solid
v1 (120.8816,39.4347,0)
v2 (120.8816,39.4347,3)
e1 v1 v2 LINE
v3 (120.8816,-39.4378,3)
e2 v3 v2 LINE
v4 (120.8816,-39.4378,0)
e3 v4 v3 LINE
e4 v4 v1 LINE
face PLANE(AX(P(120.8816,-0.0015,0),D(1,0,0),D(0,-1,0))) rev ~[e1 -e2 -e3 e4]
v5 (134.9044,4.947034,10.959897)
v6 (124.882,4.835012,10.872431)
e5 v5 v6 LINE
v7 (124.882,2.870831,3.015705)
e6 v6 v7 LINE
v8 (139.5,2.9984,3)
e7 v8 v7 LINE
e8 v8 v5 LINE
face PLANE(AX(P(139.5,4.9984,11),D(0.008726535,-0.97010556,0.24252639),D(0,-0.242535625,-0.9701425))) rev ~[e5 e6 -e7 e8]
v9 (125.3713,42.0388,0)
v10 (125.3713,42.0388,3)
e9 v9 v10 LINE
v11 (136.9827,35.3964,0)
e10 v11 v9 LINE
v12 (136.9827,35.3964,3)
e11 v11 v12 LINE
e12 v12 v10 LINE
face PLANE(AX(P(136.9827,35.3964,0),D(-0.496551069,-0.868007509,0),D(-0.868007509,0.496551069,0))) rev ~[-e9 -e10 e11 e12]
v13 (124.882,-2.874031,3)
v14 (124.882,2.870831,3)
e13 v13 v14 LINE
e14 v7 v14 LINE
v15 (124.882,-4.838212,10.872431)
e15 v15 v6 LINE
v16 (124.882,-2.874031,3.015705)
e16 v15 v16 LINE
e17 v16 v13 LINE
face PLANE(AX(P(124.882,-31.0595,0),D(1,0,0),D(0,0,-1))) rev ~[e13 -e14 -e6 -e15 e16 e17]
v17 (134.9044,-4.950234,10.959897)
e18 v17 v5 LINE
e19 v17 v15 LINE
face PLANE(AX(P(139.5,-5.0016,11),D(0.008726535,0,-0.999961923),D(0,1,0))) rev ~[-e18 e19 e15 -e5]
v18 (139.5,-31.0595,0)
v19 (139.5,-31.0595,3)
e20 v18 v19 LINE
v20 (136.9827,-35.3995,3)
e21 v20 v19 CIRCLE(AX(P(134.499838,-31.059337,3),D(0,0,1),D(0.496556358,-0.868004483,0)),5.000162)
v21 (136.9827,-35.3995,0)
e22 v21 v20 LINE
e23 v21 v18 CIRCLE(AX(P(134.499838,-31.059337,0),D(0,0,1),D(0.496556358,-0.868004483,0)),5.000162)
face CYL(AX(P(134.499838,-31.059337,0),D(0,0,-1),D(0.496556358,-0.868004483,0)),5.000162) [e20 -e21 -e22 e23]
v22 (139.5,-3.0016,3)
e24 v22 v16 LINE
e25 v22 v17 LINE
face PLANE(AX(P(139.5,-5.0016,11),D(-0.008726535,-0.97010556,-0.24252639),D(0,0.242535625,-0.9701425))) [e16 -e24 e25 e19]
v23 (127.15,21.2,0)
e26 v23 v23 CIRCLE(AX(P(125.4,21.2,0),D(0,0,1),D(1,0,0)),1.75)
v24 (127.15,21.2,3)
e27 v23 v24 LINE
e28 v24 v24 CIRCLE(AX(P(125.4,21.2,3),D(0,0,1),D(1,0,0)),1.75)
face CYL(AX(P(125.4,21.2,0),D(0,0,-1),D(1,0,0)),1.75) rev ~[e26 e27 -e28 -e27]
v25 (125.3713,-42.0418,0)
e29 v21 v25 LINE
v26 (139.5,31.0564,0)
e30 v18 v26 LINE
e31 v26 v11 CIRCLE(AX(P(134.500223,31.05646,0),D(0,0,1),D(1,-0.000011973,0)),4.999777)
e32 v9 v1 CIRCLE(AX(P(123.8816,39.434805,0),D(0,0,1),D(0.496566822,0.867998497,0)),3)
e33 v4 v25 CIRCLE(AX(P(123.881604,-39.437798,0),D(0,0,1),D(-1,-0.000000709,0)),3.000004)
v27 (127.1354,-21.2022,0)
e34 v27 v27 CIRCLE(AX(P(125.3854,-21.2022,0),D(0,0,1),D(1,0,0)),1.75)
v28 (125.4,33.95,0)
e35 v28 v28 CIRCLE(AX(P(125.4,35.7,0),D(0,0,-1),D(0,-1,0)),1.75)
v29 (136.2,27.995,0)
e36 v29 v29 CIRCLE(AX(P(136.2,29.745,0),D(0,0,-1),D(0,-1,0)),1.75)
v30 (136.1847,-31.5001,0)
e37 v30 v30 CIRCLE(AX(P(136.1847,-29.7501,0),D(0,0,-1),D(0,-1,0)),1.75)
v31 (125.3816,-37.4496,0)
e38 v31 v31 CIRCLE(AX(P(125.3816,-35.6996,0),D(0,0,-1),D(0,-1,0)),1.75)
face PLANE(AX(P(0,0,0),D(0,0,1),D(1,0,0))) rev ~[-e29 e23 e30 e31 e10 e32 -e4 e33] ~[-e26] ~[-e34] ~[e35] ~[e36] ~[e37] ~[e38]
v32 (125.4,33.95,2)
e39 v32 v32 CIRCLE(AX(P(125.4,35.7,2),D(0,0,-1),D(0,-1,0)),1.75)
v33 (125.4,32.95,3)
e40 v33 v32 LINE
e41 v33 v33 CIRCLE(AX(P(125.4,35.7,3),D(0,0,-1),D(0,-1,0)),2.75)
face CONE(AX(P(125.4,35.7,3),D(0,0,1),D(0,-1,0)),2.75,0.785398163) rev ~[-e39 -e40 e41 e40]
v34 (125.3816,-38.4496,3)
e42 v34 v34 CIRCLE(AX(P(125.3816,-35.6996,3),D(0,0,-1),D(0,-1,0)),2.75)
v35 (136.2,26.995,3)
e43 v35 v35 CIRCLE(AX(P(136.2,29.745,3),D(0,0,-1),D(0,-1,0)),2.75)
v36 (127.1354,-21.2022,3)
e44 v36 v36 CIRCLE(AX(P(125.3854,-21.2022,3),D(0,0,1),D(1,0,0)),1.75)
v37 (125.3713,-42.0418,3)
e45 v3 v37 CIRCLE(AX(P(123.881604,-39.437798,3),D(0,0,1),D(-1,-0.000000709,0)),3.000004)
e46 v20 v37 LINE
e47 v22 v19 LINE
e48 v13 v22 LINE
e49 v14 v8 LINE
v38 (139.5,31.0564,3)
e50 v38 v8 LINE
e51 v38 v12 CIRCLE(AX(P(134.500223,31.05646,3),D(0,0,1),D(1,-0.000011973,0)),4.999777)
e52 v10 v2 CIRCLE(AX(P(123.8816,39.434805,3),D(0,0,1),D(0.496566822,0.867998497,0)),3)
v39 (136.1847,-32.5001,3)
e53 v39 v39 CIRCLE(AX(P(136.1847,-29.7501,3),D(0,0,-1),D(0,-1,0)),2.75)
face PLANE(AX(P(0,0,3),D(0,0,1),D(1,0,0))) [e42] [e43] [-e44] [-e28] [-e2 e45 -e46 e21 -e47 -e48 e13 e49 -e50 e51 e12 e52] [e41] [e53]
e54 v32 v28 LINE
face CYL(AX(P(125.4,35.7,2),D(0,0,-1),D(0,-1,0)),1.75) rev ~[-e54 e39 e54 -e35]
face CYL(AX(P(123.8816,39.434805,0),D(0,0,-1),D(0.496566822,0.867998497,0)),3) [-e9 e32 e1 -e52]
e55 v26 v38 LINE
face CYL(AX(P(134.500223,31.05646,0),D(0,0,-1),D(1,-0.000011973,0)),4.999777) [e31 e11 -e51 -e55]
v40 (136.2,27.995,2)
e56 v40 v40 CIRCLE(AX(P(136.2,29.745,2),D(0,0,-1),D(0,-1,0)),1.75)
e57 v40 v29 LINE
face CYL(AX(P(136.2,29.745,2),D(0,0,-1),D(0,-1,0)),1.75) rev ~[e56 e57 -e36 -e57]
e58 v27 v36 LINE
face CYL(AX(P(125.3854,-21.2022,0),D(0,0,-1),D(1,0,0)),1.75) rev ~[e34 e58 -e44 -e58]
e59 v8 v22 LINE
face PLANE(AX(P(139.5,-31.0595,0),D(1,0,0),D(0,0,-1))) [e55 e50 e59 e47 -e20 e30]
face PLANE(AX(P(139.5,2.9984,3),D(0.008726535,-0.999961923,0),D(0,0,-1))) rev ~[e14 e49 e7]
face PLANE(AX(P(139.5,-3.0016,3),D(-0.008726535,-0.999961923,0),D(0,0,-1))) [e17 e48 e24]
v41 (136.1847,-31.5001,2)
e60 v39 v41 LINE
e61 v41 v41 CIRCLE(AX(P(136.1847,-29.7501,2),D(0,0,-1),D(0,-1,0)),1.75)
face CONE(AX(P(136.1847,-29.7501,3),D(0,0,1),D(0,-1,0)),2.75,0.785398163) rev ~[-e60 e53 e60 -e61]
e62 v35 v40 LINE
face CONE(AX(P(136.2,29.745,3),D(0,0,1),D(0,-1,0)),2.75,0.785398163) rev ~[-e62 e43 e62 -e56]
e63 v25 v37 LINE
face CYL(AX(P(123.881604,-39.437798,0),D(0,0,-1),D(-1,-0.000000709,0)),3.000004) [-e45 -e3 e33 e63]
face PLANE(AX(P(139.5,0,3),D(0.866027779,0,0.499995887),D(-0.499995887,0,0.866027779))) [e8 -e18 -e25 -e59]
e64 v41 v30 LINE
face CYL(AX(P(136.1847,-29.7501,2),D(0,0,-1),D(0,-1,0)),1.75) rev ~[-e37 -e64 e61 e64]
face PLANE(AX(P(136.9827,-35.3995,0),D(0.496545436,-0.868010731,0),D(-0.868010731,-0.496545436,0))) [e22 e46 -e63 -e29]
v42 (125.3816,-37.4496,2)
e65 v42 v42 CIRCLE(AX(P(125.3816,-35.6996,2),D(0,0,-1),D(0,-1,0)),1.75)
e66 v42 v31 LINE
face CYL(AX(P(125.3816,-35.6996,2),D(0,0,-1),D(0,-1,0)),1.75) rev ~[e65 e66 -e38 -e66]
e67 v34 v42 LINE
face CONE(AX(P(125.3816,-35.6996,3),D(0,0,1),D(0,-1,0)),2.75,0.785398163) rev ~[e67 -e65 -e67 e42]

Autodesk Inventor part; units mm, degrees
ref_plane "YZ Plane" through (0, 0, 0) normal (1, 0, 0) x (0, 1, 0)
ref_plane "XZ Plane" through (0, 0, 0) normal (0, 1, 0) x (-1, 0, 0)
sketch "Boceto1" plane through (0, 0, 0) normal (0, 0, 1) x (1, 0, 0)
  line L0 (134.9, 24.045) -> (134.9, 29.745)
  arc A0 (134.9, 24.045) -> (137.5, 24.045) centre (136.2, 24.045) ccw
  line L1 (137.5, 29.745) -> (137.5, 24.045)
  circle A1 centre (136.2, 29.745) radius 1.3 construction
  line L2 (126.9, 35.7) -> (126.9, 21.2)
  line L3 (123.9, 21.2) -> (123.9, 35.7)
  circle A2 centre (125.4, 35.7) radius 1.5 construction
  circle A3 centre (125.4, 21.2) radius 1.5 construction
  line L4 (126.8891, -21.2025) -> (126.8816, -35.7004)
  circle A4 centre (125.3854, -21.2022) radius 1.5037 construction
  line L5 (123.8816, -35.6996) -> (123.8816, -21.2019)
  circle A5 centre (125.3816, -35.6996) radius 1.5 construction
  circle A6 centre (136.1847, -29.7501) radius 1.3 construction
  line L6 (137.4876, -24.0508) -> (137.4847, -29.7508)
  arc A7 (137.4876, -24.0508) -> (134.8876, -24.0494) centre (136.1876, -24.0501) ccw
  line L7 (134.8847, -29.7494) -> (134.8876, -24.0494)
  line L8 (120.8816, 55.9985) -> (120.8816, -0.0015)
  line L9 (139.5, 56.008) -> (139.5, -0.0015)
  line L10 (50.0101, -56.038) -> (139.5, -55.992)
  line L11 (139.5, 56.008) -> (49.9528, 55.962)
  line L12 (136.8302, -30.8785) -> (126.1265, -37.0016) construction
  line L13 (136.9827, -35.3995) -> (125.3713, -42.0418)
  arc A8 (192.3943, -3.7013) -> (191.4002, 0.0347) centre (191.4012, -1.9653) ccw
  line L14 (120.8816, -0.0015) -> (120.8816, -39.4378)
  line L15 (139.5, -0.0015) -> (139.5, -31.0595)
  arc A9 (120.8816, -39.4378) -> (125.3713, -42.0418) centre (123.8816, -39.4378) ccw
  arc A10 (136.9827, -35.3995) -> (139.5, -31.0595) centre (134.5, -31.0595) ccw
  line L16 (139.5, -0.0015) -> (120.8816, -0.0015) construction
  line L17 (136.9827, 35.3964) -> (125.3713, 42.0388)
  arc A11 (125.3713, 42.0388) -> (120.8816, 39.4347) centre (123.8816, 39.4347) ccw
  arc A12 (139.5, 31.0564) -> (136.9827, 35.3964) centre (134.5, 31.0564) ccw
  line L18 (137.2847, -29.7507) -> (137.2876, -24.0507)
  arc A13 (137.2876, -24.0507) -> (135.0876, -24.0495) centre (136.1876, -24.0501) ccw
  line L19 (135.0876, -24.0495) -> (135.0847, -29.7495)
  arc A14 (135.0847, -29.7495) -> (137.2847, -29.7507) centre (136.1847, -29.7501) ccw
  line L20 (126.6816, -35.7003) -> (126.6891, -21.2024)
  arc A15 (126.6891, -21.2024) -> (124.0816, -21.2022) centre (125.3854, -21.2022) ccw
  line L21 (124.0816, -21.2022) -> (124.0816, -35.6996)
  arc A16 (124.0816, -35.6996) -> (126.6816, -35.7003) centre (125.3816, -35.6996) ccw
  arc A17 (135.1, 24.045) -> (137.3, 24.045) centre (136.2, 24.045) ccw
  line L22 (135.1, 24.045) -> (135.1, 29.745)
  arc A18 (137.3, 29.745) -> (135.1, 29.745) centre (136.2, 29.745) ccw
  line L23 (137.3, 29.745) -> (137.3, 24.045)
  line L24 (126.7, 21.2) -> (126.7, 35.7)
  arc A19 (126.7, 35.7) -> (124.1, 35.7) centre (125.4, 35.7) ccw
  line L25 (124.1, 35.7) -> (124.1, 21.2)
  arc A20 (124.1, 21.2) -> (126.7, 21.2) centre (125.4, 21.2) ccw
  circle A21 centre (125.3816, -35.6996) radius 1.75
  circle A22 centre (136.1847, -29.7501) radius 1.75
  circle A23 centre (125.4, 35.7) radius 1.75
  circle A24 centre (136.2, 29.745) radius 1.75
  circle A25 centre (125.4, 21.2) radius 1.75
  circle A26 centre (125.3854, -21.2022) radius 1.75
  point P0 (0, 0)
  point P1 (120.8816, -56.0015)
  point P2 (139.5, -33.9595)
  point P3 (120.8816, -44.6101)
  point P4 (126.7, 34.5285)
  point P5 (124.1, 34.5285)
  point P6 (137.3, 28.3839)
  point P7 (135.1, 28.3839)
  point P8 (124.0816, -34.5281)
  point P9 (126.6823, -34.5287)
  point P10 (135.0854, -28.3885)
  point P11 (137.2854, -28.3896)
  dimension "d0" = 3
  dimension "d1" = 2
  dimension "d2" = 4
  dimension "d3" = 2
  dimension "d4" = 3
  dimension "d5" = 5
  dimension "d8" = 0.2
  dimension "d9" = 0.2
  dimension "d10" = 0.2
  dimension "d11" = 0.2
  dimension "d14" = 3.5
  dimension "d15" = 3.5
  dimension "d16" = 3.5
  dimension "d17" = 3.5
  dimension "d18" = 3.5
  dimension "d19" = 3.5
extrude "Extrusión1" add sketch "Boceto1" along normal blind 3 contours L0 A24 L22 A17 L23 L1 A0 | A24 L23 A18 L22 | A24 L23 A17 L22 | L22 A18 L23 A24 | L2 A25 L24 A23 | A23 L24 A19 L25 | A23 L25 A19 L24 | L24 A25 L25 A23 | L25 A25 L3 A23 | L4 A21 L20 A26 | A21 L21 A16 L20 | L20 A21 L21 A26 | L20 A16 L21 A21 | L21 A21 L5 A26 | L6 A22 L18 A13 L19 L7 A7 | A22 L19 A14 L18 | A22 L19 A13 L18 | L18 A14 L19 A22 | A11 L17 A12 L9 L15 A10 L13 A9 L14 L8
extrude "Extrusión2" [suppressed]
sketch "Boceto2" plane through (0, 0, 3) normal (0, 0, 1) x (1, 0, 0)
  point P0 (0, 0)
  point P1 (125.4, 35.7)
  point P2 (136.2, 29.745)
  point P3 (125.4, 21.2)
  point P4 (136.1847, -29.7501)
  point P5 (125.3854, -21.2022)
  point P6 (125.3816, -35.6996)
hole "Agujero1" at (125.4, 35.7, 3) at (136.2, 29.745, 3) at (136.1847, -29.7501, 3) at (125.3816, -35.6996, 3) direction (0, 0, -1) diameter 3.5 end through all countersink diameter 5.5 countersink angle 90
ref_plane "Plano de trabajo1" through (130.1908, -31.0595, 0) normal (1, 0, 0) x (0, 0, -1)
sketch "Boceto3" plane through (139.5, -31.0595, 0) normal (1, 0, 0) x (0, 0, -1)
  line L0 (-3, 31.0579) -> (-11, 31.0579) construction
  line L1 (-11, 26.0579) -> (-11, 36.0579)
  line L2 (-11, 26.0579) -> (-3, 28.0579)
  line L3 (-11, 36.0579) -> (-3, 34.0579)
  line L4 (0, 0) -> (0, 62.1159)
  line L5 (-3, 28.0579) -> (0, 28.0579)
  line L6 (-3, 34.0579) -> (0, 34.0579)
  line L7 (-3, 0) -> (-3, 28.0579)
  line L8 (-3, 34.0579) -> (-3, 62.1159)
  line L9 (-3, 0) -> (-3, 28.0579)
  line L10 (-3, 34.0579) -> (-3, 62.1159)
  point P0 (0, 31.0595)
  dimension "d27" = 8
  dimension "d28" = 10
  dimension "d29" = 6
extrude "Extrusión3" add sketch "Boceto3" against normal blind 14.618 draft -0.5
sketch "Boceto4" plane through (0, 0, 0) normal (0, 1, 0) x (-1, 0, 0)
  line L0 (-124.882, 10.8724) -> (-124.882, 3.0157) projected
  line L1 (-139.5, 3) -> (-124.882, 3.0157) projected
  line L2 (-139.5, 11) -> (-139.5, 3) projected
  line L3 (-139.5, 11) -> (-124.882, 10.8724) projected
  line L4 (-139.5, 3) -> (-134.9044, 10.9599)
  point P0 (0, 0)
  dimension "d32" = 30
extrude "Extrusión4" cut sketch "Boceto4" along normal through all both and the other way through all contours L4 L2 L3
properties part number "AcopleCamara-part1"
